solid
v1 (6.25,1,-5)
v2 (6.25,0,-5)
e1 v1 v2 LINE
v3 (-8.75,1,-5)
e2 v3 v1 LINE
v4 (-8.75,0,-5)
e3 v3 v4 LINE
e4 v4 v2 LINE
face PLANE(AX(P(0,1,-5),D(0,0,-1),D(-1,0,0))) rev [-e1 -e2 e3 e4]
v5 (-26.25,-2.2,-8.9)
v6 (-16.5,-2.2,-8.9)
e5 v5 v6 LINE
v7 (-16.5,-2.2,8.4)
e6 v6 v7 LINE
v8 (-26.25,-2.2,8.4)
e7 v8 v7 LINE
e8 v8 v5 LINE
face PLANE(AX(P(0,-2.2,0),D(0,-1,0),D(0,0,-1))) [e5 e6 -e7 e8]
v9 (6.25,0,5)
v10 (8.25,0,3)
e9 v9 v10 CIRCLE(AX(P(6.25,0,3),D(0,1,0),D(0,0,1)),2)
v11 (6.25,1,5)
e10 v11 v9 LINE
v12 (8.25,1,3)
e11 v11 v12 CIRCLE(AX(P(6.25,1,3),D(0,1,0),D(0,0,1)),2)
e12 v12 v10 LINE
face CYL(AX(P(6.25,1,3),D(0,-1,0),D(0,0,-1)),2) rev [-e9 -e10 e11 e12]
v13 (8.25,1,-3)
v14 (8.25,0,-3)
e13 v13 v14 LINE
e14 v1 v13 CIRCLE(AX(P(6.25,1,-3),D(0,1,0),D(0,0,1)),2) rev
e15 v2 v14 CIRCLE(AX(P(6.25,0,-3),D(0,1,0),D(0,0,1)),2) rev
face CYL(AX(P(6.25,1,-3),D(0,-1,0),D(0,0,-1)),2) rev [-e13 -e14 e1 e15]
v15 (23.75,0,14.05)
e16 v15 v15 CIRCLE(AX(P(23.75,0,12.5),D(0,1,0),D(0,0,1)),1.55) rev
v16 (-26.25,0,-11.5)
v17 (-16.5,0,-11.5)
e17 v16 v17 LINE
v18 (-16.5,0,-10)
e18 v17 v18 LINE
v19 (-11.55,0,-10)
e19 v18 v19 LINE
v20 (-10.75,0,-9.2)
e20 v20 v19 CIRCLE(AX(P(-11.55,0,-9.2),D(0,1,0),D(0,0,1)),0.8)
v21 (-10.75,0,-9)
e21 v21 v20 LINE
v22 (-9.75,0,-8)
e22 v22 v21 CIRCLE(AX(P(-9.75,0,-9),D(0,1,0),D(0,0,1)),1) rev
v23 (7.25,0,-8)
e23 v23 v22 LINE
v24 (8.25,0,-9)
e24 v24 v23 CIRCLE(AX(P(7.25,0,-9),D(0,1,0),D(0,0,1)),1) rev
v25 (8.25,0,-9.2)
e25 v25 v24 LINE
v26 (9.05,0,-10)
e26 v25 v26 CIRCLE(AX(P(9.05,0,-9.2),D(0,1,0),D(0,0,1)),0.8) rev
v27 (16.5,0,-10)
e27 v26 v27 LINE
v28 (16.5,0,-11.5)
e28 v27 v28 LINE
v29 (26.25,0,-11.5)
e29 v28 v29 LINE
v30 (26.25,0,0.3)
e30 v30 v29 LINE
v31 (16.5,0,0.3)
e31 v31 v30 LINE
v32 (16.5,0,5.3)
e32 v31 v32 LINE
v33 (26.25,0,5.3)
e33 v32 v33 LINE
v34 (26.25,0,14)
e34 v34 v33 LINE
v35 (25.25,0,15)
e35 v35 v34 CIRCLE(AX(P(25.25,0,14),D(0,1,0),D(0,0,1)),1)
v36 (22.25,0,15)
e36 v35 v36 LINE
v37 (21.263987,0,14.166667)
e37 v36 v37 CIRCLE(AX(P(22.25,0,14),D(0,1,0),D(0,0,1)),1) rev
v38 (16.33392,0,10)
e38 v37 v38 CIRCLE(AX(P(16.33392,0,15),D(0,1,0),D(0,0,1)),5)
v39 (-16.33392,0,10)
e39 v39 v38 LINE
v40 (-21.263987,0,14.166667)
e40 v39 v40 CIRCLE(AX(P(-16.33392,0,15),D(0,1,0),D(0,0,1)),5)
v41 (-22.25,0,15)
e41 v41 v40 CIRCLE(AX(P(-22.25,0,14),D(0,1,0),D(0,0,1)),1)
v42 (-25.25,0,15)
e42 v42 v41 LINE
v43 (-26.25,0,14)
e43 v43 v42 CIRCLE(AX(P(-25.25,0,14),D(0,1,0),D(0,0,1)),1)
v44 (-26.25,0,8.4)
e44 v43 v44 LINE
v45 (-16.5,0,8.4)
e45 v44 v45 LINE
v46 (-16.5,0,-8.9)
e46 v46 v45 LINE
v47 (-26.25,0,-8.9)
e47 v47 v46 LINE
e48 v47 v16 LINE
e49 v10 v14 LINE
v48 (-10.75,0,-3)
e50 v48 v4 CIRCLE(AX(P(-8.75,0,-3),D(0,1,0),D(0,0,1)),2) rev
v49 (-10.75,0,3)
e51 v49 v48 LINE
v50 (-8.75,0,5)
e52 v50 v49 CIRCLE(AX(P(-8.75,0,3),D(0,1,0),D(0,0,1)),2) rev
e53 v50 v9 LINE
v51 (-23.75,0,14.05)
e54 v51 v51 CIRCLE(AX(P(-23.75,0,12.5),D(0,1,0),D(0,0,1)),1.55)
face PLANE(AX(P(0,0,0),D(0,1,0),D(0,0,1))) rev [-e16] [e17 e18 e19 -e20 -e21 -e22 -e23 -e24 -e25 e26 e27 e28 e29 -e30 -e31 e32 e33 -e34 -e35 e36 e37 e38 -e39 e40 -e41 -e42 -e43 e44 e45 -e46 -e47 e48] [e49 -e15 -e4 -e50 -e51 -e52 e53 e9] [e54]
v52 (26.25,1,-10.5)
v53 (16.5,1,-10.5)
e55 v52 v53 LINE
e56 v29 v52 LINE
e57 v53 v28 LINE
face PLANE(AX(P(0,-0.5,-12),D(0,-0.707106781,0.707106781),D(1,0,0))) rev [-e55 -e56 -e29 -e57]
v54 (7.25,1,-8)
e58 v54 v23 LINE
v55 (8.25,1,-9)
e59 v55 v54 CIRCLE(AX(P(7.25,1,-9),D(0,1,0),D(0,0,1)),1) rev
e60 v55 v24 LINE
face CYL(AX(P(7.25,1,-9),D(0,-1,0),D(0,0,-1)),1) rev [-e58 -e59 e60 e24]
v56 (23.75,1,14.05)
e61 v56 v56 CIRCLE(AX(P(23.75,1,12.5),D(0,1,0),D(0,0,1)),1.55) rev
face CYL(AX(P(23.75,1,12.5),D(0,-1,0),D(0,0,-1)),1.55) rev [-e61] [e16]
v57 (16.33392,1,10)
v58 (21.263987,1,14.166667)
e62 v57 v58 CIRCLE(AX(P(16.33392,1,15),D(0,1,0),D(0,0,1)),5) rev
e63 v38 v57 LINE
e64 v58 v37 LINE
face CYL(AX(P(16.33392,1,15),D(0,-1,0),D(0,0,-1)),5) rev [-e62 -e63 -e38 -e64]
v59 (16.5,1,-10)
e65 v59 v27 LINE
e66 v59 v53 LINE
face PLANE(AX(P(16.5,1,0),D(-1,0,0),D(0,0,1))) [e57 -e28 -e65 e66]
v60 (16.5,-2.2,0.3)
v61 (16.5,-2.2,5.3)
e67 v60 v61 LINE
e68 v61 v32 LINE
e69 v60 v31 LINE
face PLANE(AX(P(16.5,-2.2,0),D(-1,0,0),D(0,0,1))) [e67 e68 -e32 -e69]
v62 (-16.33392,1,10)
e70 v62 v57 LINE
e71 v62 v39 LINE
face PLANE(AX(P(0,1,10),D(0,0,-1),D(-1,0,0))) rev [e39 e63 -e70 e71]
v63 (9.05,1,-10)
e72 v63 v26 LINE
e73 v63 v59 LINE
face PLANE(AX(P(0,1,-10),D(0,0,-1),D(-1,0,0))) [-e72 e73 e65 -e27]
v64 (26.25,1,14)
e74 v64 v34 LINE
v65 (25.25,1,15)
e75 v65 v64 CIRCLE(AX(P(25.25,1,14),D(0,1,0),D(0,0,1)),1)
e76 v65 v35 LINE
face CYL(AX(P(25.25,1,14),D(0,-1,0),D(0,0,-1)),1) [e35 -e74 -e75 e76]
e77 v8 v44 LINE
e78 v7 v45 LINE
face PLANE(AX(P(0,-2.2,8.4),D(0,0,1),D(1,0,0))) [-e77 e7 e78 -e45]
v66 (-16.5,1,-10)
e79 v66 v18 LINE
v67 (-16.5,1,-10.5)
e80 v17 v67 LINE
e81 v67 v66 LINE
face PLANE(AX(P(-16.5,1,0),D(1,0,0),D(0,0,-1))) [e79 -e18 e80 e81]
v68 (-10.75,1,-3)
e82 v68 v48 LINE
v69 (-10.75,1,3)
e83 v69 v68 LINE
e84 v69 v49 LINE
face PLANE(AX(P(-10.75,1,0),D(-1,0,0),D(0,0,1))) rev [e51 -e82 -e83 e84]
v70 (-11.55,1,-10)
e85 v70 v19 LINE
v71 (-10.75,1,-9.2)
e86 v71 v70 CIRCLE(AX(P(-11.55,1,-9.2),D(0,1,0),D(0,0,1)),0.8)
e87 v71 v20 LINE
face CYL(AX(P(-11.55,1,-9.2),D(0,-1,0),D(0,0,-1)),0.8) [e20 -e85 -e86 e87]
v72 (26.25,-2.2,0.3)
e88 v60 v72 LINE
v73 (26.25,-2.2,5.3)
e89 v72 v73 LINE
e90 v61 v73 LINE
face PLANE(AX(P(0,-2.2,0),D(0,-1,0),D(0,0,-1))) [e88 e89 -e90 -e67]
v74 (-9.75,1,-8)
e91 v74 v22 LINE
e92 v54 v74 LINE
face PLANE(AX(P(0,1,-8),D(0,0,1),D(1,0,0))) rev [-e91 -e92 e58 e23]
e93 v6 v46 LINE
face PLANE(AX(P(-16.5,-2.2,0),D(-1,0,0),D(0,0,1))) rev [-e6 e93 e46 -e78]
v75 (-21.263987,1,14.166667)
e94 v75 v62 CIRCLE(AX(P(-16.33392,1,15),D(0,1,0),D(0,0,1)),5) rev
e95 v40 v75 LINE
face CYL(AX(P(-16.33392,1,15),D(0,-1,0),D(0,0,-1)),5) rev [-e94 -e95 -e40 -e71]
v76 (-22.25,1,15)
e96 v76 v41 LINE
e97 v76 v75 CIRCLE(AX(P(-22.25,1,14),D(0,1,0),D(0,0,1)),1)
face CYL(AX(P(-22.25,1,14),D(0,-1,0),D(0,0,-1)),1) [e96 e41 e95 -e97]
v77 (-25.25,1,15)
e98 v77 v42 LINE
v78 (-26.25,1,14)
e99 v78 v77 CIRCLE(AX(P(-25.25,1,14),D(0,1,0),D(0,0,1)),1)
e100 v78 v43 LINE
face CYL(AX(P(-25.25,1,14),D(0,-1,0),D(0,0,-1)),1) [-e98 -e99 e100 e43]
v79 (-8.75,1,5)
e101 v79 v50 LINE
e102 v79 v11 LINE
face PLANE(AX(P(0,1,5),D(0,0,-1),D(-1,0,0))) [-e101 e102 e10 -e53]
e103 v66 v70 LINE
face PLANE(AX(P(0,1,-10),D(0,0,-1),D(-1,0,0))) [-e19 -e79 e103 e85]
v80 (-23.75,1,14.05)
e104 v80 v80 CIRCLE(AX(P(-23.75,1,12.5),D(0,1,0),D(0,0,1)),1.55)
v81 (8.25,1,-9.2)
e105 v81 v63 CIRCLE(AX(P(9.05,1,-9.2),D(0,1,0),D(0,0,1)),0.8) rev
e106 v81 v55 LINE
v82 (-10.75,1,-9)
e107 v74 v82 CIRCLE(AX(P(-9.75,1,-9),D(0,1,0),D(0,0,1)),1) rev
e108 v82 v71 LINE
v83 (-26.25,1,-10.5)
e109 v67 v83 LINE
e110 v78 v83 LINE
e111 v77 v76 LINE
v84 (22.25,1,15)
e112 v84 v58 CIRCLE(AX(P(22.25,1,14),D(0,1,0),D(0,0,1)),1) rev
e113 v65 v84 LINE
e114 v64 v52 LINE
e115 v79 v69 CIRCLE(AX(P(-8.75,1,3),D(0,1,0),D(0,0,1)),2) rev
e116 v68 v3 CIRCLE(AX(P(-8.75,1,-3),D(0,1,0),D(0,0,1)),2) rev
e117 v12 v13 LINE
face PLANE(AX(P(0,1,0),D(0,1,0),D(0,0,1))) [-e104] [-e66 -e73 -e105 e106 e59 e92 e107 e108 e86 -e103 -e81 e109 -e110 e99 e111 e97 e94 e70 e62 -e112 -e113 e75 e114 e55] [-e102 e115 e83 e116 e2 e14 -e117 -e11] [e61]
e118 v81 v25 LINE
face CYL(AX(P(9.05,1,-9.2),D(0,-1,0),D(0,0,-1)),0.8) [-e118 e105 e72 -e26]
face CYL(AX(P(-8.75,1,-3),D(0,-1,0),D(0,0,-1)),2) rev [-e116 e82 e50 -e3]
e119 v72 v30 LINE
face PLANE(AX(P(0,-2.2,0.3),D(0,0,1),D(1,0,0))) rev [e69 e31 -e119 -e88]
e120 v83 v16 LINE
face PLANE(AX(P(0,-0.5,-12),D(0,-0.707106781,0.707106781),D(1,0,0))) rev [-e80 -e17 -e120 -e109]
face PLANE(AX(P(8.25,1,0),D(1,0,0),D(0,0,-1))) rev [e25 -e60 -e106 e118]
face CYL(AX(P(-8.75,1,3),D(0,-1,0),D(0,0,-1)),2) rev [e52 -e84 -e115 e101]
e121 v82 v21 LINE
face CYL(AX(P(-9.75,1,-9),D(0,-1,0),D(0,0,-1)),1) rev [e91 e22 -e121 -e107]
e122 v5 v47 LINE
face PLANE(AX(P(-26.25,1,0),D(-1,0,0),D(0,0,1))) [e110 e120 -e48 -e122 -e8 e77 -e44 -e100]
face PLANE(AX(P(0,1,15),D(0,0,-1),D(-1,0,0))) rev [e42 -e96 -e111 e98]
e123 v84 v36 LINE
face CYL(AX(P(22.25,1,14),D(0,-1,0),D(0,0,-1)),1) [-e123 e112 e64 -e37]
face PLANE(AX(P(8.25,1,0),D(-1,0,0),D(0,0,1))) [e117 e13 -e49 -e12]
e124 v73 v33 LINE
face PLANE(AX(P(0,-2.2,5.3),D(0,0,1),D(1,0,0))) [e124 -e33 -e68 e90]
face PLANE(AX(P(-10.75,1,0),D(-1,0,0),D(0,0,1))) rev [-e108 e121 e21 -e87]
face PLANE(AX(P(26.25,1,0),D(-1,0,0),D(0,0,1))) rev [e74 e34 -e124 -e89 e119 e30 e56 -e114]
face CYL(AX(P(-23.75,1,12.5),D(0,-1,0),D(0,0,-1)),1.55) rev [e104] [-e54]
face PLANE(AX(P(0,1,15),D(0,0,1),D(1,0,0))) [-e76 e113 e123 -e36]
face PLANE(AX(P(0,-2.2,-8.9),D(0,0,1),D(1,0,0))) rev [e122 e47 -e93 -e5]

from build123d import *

# Parameters (mm, degrees)
SKETCH1_R           = 1.55
BOSS_EXTRUDE1_DEPTH = 1
CHAMFER1_SIZE       = 1.5
SKETCH5_W           = 9.75
SKETCH5_H           = 17.3
SKETCH5_H_2         = 5
BOSS_EXTRUDE2_DEPTH = 2.2
FILLET2_R           = 5


with BuildPart() as part:
    # Sketch1 → Boss-Extrude1 (new body)
    with BuildSketch(Plane(origin=(0, 0, 0), x_dir=(1, 0, 0), z_dir=(0, 1, 0))):
        with BuildLine():
            Line((-11.55, 10), (-16.5, 10))
            Line((-16.5, 10), (-16.5, 12))
            Line((-16.5, 12), (-26.25, 12))
            Line((-26.25, 12), (-26.25, -14))
            ThreePointArc((-26.25, -14), (-25.957106781, -14.707106781), (-25.25, -15))
            Line((-25.25, -15), (-22.25, -15))
            ThreePointArc((-22.25, -15), (-21.542893219, -14.707106781), (-21.25, -14))
            Line((-21.25, -14), (-21.25, -10))
            Line((-21.25, -10), (21.25, -10))
            Line((21.25, -10), (21.25, -14))
            ThreePointArc((21.25, -14), (21.542893219, -14.707106781), (22.25, -15))
            Line((22.25, -15), (25.25, -15))
            ThreePointArc((25.25, -15), (25.957106781, -14.707106781), (26.25, -14))
            Line((26.25, -14), (26.25, 12))
            Line((26.25, 12), (16.5, 12))
            Line((16.5, 12), (16.5, 10))
            Line((16.5, 10), (9.05, 10))
            ThreePointArc((9.05, 10), (8.484314575, 9.765685425), (8.25, 9.2))
            Line((8.25, 9.2), (8.25, 9))
            ThreePointArc((8.25, 9), (7.957106781, 8.292893219), (7.25, 8))
            Line((7.25, 8), (-9.75, 8))
            ThreePointArc((-9.75, 8), (-10.457106781, 8.292893219), (-10.75, 9))
            Line((-10.75, 9), (-10.75, 9.2))
            ThreePointArc((-10.75, 9.2), (-10.984314575, 9.765685425), (-11.55, 10))
        make_face()
        with BuildLine():
            Line((6.25, -5), (-8.75, -5))
            ThreePointArc((-8.75, -5), (-10.164213562, -4.414213562), (-10.75, -3))
            Line((-10.75, -3), (-10.75, 3))
            ThreePointArc((-10.75, 3), (-10.164213562, 4.414213562), (-8.75, 5))
            Line((-8.75, 5), (6.25, 5))
            ThreePointArc((6.25, 5), (7.664213562, 4.414213562), (8.25, 3))
            Line((8.25, 3), (8.25, -3))
            ThreePointArc((8.25, -3), (7.664213562, -4.414213562), (6.25, -5))
        make_face(mode=Mode.SUBTRACT)
        with Locations(Location((-23.75, -12.5, 0), (0, 0, 270))):
            Circle(SKETCH1_R, mode=Mode.SUBTRACT)
        with Locations(Location((23.75, -12.5, 0), (0, 0, 270))):
            Circle(SKETCH1_R, mode=Mode.SUBTRACT)
    extrude(amount=BOSS_EXTRUDE1_DEPTH)

    # Chamfer1
    # the kernel refuses this chamfer: 1.5 mm, written as the material it takes off along each edge
    with BuildSketch(Plane(origin=(-12.642475518, 1, -12), x_dir=(0, -0.9996219169112968, -0.027495876610586778), z_dir=(-1, 0, 0)), Plane(origin=(30.107524482, 1, -12), x_dir=(0, -0.9996219169112968, -0.027495876610586778), z_dir=(-1, 0, 0))) as chamfer1_piece_1:
        Polygon((CHAMFER1_SIZE * 0.999621916911, CHAMFER1_SIZE * 0.0274958766106), (-CHAMFER1_SIZE * 0.0274958766106, CHAMFER1_SIZE * 0.999621916911), (0, 0), align=None)
    extrude(amount=17.465048964, mode=Mode.SUBTRACT)

    # Sketch5 → Boss-Extrude2 (add)
    with BuildSketch(Plane.XZ):
        with Locations((-21.375, -0.25)):
            Rectangle(SKETCH5_W, SKETCH5_H)
        with Locations((21.375, 2.8)):
            Rectangle(SKETCH5_W, SKETCH5_H_2)
    extrude(amount=BOSS_EXTRUDE2_DEPTH)

    # Fillet2
    fillet2_edges = [part.edges().sort_by_distance(p)[0] for p in [
        (21.25, 0.5, 10),
        (-21.25, 0.5, 10),
    ]]
    fillet(fillet2_edges, radius=FILLET2_R)


solid = part.part
